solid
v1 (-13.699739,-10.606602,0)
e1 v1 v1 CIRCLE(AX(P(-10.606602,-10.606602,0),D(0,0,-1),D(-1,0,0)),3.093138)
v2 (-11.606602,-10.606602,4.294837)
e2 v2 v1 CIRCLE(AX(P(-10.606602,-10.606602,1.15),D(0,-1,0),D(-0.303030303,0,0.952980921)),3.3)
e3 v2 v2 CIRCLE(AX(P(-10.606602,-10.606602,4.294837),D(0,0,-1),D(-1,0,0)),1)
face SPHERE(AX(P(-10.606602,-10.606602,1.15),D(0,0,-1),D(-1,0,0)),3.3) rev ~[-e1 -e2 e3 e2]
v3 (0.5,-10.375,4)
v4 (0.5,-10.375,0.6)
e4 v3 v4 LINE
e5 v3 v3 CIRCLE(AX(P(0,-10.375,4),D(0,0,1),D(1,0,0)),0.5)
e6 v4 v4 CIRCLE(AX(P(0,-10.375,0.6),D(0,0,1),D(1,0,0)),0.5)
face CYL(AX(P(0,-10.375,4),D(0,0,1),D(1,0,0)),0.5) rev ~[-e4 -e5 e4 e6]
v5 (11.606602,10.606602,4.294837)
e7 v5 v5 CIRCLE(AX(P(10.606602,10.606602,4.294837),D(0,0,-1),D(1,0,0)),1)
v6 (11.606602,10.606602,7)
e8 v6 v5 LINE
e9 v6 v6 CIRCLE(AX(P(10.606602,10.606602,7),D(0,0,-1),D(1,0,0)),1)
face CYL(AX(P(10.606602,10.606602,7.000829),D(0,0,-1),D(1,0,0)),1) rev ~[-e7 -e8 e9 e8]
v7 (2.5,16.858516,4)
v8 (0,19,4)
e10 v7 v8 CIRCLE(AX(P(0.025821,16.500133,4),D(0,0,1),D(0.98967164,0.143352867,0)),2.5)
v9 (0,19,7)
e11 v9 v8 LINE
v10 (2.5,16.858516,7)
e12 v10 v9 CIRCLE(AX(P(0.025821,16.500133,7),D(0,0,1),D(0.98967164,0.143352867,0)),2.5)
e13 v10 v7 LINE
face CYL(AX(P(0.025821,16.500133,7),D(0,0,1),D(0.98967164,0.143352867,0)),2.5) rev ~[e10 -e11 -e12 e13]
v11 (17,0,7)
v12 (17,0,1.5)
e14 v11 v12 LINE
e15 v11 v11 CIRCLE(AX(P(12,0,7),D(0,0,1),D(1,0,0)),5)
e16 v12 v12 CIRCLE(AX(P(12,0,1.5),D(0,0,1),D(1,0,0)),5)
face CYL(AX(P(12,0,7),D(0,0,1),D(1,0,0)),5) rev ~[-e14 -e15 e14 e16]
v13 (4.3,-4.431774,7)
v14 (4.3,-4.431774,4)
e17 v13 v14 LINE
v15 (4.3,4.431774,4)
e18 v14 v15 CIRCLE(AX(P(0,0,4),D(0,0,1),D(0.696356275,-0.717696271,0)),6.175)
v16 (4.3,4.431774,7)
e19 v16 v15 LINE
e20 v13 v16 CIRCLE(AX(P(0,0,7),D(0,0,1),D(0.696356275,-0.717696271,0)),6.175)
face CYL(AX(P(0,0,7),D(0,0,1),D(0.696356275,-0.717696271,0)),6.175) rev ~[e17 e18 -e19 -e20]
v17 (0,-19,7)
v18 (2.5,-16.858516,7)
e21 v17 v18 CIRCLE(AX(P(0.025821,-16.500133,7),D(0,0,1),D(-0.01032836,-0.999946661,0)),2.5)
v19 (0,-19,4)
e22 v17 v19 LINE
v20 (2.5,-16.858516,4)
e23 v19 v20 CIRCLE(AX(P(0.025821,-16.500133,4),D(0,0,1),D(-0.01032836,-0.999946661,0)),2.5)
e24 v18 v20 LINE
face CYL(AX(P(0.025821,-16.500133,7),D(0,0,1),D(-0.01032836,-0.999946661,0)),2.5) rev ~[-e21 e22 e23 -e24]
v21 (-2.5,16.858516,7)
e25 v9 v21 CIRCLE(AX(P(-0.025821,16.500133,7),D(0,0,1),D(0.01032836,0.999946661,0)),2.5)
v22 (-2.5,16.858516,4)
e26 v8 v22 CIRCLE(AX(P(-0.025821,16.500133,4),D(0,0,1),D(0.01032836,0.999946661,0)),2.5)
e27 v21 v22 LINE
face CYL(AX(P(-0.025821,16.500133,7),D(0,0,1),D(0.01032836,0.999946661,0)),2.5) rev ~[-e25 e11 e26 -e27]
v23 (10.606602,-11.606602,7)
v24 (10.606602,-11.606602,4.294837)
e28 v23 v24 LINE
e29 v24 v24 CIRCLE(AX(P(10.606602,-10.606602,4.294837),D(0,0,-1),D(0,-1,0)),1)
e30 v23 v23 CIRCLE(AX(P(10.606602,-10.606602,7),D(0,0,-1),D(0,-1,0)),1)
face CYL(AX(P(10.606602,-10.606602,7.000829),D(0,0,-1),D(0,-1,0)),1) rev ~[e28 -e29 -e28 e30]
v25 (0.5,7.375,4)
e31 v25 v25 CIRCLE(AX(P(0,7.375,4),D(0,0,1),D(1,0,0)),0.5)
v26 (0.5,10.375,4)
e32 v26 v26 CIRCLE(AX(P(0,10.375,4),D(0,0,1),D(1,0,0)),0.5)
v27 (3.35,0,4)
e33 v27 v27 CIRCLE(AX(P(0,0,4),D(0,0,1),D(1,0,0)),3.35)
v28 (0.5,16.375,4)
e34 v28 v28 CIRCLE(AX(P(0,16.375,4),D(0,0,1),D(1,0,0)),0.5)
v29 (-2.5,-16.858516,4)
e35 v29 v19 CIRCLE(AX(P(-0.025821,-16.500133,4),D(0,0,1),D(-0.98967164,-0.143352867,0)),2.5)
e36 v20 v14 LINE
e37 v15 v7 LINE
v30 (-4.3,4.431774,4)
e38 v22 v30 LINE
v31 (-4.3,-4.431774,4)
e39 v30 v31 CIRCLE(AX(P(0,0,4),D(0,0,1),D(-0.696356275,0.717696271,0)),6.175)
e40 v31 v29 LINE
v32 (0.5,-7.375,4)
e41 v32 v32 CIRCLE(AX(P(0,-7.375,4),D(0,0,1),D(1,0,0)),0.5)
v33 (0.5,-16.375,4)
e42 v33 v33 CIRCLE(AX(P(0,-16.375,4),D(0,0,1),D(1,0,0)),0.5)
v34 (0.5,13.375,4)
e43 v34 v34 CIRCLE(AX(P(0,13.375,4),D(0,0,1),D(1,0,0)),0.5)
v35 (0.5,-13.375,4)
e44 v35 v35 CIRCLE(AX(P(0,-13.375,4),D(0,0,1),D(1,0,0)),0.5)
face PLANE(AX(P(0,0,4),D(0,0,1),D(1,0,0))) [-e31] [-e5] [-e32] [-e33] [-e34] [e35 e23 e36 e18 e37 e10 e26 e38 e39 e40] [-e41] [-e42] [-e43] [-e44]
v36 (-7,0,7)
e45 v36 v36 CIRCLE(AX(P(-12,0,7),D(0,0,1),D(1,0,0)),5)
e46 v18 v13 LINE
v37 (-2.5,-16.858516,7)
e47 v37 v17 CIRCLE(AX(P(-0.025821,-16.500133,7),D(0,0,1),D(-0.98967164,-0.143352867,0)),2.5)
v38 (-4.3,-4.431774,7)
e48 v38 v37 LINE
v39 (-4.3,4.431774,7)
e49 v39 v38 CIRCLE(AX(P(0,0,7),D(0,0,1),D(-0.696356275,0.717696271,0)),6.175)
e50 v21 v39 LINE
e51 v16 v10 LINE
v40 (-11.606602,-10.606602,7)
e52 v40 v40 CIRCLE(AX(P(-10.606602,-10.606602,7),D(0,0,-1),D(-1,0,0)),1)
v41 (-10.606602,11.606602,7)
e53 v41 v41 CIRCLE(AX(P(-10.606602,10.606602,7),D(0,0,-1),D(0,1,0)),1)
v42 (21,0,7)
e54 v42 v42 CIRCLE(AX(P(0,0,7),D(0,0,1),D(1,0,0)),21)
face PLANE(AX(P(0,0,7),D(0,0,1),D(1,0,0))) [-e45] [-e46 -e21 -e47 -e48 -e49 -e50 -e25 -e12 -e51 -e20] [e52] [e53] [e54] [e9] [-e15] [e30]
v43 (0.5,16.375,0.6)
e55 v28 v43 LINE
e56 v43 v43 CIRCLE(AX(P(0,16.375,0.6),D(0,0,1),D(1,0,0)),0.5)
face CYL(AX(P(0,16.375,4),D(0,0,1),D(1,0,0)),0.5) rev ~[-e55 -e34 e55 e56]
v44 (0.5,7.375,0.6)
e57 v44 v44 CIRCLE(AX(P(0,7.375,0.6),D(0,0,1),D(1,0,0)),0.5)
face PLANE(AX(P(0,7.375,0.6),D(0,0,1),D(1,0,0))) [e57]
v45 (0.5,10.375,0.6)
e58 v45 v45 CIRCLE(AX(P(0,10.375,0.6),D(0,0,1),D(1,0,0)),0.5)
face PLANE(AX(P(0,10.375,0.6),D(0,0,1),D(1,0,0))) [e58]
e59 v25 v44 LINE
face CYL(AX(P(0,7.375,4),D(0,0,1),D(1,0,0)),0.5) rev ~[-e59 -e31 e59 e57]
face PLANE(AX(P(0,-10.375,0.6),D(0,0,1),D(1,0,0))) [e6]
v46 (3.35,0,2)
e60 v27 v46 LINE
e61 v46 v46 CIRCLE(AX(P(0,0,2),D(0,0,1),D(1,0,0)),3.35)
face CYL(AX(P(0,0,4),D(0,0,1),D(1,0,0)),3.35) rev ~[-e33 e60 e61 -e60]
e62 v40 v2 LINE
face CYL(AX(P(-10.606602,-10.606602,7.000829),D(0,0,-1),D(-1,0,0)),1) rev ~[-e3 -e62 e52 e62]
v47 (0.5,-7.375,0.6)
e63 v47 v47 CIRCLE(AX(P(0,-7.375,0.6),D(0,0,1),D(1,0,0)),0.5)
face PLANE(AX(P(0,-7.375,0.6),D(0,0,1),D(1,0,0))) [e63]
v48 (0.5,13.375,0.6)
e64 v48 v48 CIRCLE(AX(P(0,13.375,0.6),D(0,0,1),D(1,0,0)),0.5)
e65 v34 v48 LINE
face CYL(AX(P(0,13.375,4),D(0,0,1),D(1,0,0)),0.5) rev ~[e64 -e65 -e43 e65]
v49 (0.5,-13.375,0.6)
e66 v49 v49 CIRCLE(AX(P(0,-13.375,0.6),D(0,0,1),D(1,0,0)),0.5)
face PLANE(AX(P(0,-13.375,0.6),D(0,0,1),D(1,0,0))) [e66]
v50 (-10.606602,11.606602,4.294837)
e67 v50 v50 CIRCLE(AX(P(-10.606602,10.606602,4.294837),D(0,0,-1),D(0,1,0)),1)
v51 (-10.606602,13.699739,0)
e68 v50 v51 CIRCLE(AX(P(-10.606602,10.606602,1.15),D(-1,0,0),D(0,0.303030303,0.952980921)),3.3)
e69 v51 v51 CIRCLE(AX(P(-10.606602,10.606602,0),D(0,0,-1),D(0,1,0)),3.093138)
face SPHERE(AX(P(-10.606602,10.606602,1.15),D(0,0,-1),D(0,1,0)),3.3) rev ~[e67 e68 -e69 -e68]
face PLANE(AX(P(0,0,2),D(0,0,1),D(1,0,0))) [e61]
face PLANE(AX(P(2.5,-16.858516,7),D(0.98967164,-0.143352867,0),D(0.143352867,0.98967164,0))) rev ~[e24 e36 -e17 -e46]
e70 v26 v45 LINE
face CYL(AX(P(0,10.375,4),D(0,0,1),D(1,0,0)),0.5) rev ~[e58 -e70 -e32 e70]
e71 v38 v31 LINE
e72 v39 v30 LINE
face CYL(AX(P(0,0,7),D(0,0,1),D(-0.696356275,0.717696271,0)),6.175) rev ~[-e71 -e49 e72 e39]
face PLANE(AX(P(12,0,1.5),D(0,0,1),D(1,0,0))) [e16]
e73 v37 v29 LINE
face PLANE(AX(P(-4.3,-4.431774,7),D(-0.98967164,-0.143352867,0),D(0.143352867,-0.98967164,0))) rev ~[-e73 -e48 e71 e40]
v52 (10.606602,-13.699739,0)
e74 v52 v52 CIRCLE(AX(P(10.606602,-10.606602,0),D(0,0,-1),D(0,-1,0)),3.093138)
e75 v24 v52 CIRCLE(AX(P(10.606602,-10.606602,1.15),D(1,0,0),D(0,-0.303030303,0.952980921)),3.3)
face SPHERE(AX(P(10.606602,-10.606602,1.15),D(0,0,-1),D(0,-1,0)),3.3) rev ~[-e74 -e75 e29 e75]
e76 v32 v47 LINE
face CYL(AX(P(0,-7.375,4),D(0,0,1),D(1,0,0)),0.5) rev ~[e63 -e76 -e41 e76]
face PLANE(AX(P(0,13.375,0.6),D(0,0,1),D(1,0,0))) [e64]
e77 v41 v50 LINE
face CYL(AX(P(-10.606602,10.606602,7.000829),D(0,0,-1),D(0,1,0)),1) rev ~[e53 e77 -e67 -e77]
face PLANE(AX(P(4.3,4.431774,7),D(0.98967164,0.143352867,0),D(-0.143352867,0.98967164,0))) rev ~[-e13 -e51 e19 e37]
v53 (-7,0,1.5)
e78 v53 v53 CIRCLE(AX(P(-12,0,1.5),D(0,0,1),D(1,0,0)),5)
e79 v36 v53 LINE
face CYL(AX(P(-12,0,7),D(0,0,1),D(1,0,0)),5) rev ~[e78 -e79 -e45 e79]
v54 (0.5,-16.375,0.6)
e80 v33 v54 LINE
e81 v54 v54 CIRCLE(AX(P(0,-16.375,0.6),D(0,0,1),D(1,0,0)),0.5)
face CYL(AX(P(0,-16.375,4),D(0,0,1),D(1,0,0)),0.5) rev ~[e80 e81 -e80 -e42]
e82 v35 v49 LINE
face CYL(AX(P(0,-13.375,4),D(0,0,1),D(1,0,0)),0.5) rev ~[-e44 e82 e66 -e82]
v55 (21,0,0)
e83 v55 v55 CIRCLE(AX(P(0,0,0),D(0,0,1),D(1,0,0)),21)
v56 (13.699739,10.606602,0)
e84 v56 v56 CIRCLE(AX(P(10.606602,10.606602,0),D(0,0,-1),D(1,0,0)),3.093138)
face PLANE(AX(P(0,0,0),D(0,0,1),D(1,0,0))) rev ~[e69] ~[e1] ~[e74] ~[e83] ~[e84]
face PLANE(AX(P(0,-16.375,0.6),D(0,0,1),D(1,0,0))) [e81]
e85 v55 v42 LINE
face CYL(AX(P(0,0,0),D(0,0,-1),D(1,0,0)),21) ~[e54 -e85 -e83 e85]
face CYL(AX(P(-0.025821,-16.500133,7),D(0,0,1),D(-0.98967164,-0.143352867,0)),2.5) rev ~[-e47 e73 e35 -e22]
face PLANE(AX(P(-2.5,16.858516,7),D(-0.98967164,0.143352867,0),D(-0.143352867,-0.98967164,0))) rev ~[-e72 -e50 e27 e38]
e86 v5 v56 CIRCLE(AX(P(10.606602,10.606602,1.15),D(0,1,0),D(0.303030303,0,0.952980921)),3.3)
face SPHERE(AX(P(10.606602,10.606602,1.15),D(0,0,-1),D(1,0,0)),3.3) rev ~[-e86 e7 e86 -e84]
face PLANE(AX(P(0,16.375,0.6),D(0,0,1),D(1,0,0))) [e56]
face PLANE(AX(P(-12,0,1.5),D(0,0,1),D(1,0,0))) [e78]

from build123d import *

# Parameters (mm, degrees)
F0_R             = 21
F1_DEPTH         = 7
F3_DEPTH         = 3
F4_R             = 3.35
F5_DEPTH         = 2
F6_R             = 0.5
F7_DEPTH         = 3.4
F8_R             = 5
F9_DEPTH         = 5.5
F13_COPIES_COUNT = 4


# Not quite as in the source:
# - a pattern or mirror of a feature is missing from the dataset's text; its kind, count and spacing are read off the source's solid


with BuildPart() as f1:
    # F0 (on Top) → F1 (new body)
    with BuildSketch(Plane.XY):
        Circle(F0_R)
    extrude(amount=F1_DEPTH)

    # F2 (on face) → F3 (cut)
    with BuildSketch(Plane.XY.offset(7)):
        with BuildLine():
            Line((-2.5, 16.8585155142), (-4.3, 4.4317744753))
            ThreePointArc((-4.3, 4.4317744753), (-6.175, 0), (-4.3, -4.4317744753))
            Line((-4.3, -4.4317744753), (-2.5, -16.8585155142))
            ThreePointArc((-2.5, -16.8585155142), (-1.6521982913, -18.3987898667), (0, -19))
            ThreePointArc((0, -19), (1.6521982913, -18.3987898667), (2.5, -16.8585155142))
            Line((2.5, -16.8585155142), (4.3, -4.4317744753))
            ThreePointArc((4.3, -4.4317744753), (6.175, 0), (4.3, 4.4317744753))
            Line((4.3, 4.4317744753), (2.5, 16.8585155142))
            ThreePointArc((2.5, 16.8585155142), (1.6521982913, 18.3987898667), (0, 19))
            ThreePointArc((0, 19), (-1.6521982913, 18.3987898667), (-2.5, 16.8585155142))
        make_face()
    extrude(amount=-F3_DEPTH, mode=Mode.SUBTRACT)

    # F4 (on face) → F5 (cut)
    with BuildSketch(Plane.XY.offset(4)):
        Circle(F4_R)
    extrude(amount=-F5_DEPTH, mode=Mode.SUBTRACT)

    # F6 (on face) → F7 (cut)
    with BuildSketch(Plane.XY.offset(4)):
        with Locations((0, 7.375)):
            Circle(F6_R)
        with Locations((0, 10.375)):
            Circle(F6_R)
        with Locations((0, 13.375)):
            Circle(F6_R)
        with Locations((0, 16.375)):
            Circle(F6_R)
        with Locations((0, -7.375)):
            Circle(F6_R)
        with Locations((0, -10.375)):
            Circle(F6_R)
        with Locations((0, -13.375)):
            Circle(F6_R)
        with Locations((0, -16.375)):
            Circle(F6_R)
    extrude(amount=-F7_DEPTH, mode=Mode.SUBTRACT)

    # F8 (on face) → F9 (cut, through all)
    with BuildSketch(Plane.XY.offset(7)):
        with Locations((-12, 0)):
            Circle(F8_R)
        with Locations((12, 0)):
            Circle(F8_R)
    extrude(amount=-F9_DEPTH, mode=Mode.SUBTRACT)

    # F12 (on plane+point) → F13 (revolve, cut)
    with BuildSketch(Plane.XZ.offset(10.6066017178)):
        with BuildLine():
            Line((-10.6066017178, 0), (-10.6066017178, 7))
            Line((-10.6066017178, 7), (-11.6066017178, 7.0008294335))
            Line((-11.6066017178, 7.0008294335), (-11.6066017178, 4.2948370387))
            ThreePointArc((-11.6066017178, 4.2948370387), (-13.8675802694, 0.6440169112), (-10.6066017178, -2.15))
            Line((-10.6066017178, -2.15), (-10.6066017178, 0))
        make_face()
    f13 = revolve(axis=Axis((-10.6066017178, -10.6066017178, -1.075), (0, 0, -1)), mode=Mode.SUBTRACT)

    # F13_copies: F13 ×4 about axis
    f13_copies_axis = Axis((0, 0, 0), (0, 0, 1))
    for i in range(1, F13_COPIES_COUNT):
        add(f13.rotate(f13_copies_axis, i * 360 / F13_COPIES_COUNT), mode=Mode.SUBTRACT)


solid = f1.part
